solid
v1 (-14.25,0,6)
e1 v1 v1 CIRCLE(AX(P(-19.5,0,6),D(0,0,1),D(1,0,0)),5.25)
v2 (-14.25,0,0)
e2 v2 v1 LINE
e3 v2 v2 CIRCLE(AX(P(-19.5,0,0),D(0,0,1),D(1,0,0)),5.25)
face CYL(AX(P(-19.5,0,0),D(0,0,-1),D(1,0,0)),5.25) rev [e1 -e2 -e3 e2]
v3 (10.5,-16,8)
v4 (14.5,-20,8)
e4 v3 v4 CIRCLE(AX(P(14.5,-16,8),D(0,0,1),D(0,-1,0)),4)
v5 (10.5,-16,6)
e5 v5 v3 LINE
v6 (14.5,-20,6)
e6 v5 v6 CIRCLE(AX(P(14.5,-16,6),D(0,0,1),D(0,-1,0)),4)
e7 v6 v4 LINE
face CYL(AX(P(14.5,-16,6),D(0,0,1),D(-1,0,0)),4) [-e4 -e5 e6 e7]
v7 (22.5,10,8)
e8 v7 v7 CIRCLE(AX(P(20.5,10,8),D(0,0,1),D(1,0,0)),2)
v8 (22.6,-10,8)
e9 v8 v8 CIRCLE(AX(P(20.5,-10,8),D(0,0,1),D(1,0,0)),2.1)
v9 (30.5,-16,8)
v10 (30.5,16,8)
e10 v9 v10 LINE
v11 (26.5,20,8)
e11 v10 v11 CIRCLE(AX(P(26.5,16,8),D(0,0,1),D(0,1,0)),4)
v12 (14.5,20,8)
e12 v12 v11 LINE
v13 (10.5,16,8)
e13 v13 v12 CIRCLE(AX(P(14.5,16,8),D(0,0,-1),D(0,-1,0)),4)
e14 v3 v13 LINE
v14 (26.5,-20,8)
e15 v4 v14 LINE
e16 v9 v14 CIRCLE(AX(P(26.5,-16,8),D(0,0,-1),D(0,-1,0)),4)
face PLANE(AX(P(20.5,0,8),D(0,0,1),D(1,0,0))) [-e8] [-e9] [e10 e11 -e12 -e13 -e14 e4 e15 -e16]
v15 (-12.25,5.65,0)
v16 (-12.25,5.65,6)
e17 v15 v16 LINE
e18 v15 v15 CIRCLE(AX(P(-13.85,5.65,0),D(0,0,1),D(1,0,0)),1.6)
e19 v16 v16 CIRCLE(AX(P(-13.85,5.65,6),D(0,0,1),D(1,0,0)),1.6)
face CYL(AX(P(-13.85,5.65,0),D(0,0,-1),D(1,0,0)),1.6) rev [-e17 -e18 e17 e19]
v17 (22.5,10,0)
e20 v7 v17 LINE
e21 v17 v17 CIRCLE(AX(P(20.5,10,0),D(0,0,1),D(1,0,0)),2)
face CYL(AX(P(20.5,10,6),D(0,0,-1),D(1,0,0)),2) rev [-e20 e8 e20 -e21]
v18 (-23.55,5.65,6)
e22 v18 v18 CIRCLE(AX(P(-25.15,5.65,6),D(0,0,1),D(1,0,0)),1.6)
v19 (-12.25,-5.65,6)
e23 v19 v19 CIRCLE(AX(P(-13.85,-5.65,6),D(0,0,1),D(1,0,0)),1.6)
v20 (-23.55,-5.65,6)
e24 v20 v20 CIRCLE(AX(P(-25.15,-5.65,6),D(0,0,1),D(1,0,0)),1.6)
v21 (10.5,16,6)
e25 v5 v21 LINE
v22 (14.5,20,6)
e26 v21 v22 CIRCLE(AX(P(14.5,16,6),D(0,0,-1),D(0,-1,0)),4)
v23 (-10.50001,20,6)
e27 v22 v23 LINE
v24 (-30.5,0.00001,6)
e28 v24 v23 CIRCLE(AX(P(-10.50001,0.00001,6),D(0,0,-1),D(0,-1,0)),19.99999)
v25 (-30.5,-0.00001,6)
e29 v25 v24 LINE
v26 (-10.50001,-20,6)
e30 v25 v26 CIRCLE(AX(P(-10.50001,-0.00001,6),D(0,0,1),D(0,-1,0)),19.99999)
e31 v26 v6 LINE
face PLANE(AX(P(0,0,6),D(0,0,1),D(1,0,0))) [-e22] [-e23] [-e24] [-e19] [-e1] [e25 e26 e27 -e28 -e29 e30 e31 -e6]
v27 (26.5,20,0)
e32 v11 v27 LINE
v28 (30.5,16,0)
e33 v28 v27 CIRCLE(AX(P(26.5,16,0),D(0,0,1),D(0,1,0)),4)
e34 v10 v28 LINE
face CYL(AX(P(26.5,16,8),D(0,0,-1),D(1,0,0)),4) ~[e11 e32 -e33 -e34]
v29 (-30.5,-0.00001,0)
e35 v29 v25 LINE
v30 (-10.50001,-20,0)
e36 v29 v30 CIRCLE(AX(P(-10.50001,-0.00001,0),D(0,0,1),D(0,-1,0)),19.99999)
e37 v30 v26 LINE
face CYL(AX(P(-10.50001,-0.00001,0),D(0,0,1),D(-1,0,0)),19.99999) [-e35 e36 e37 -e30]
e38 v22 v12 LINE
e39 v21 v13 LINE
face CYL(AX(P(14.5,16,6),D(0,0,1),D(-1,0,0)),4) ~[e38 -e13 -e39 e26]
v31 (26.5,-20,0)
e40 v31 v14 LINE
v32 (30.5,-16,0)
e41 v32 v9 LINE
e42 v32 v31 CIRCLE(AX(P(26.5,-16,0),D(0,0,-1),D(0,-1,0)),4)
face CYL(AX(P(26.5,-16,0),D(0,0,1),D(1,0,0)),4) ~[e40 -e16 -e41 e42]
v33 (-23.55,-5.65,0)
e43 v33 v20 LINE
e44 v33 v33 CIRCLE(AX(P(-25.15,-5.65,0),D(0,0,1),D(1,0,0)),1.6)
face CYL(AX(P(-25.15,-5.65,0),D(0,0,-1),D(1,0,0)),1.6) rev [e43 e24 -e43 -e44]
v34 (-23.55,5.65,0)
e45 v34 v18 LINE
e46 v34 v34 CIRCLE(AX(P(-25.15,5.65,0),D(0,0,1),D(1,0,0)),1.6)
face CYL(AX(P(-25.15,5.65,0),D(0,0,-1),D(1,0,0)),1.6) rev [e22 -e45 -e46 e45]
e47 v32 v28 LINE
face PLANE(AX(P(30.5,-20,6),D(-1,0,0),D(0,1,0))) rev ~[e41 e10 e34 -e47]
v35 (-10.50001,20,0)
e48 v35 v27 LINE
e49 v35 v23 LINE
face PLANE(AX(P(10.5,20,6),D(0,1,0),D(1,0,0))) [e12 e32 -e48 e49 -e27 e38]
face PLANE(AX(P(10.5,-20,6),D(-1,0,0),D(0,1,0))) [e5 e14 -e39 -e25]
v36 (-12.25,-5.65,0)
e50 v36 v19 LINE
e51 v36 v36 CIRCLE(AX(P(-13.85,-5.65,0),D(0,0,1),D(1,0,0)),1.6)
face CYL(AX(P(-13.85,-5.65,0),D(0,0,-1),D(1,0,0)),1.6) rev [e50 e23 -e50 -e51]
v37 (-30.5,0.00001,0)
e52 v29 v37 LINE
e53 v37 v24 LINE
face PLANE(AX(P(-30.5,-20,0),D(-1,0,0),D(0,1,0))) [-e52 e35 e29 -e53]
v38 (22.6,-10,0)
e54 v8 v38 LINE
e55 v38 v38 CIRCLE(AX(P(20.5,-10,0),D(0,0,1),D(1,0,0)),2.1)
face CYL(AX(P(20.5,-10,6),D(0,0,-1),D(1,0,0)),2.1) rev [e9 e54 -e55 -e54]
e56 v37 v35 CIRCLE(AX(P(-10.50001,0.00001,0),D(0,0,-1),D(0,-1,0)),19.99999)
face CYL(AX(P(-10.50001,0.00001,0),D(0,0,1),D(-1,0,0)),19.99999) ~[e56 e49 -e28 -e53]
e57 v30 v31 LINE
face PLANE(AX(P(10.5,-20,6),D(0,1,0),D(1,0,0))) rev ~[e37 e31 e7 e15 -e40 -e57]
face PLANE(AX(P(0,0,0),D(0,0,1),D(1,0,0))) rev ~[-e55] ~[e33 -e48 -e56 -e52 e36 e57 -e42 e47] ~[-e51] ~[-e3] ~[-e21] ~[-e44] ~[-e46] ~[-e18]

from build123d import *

# Parameters (mm, degrees)
F0_W     = 61
F0_H     = 40
F0_R     = 1.6
F0_R_2   = 2.1
F0_R_3   = 5.25
F0_R_4   = 2
F1_DEPTH = 6
F2_DEPTH = 77
F3_R     = 19.99999
F4_W     = 20
F4_H     = 40
F4_R     = 2.1
F4_R_2   = 2
F5_DEPTH = 2
F6_R     = 4


# Not quite as in the source:
# - a fillet or chamfer is up to 0.001 mm smaller than in the source, because OpenCascade refuses the exact size
# - an extrude ends at something that could not be found from the text; its depth is read off the source's solid


with BuildPart() as f1:
    # F0 (on Top) → F1 (new body)
    with BuildSketch(Plane.XY):
        Rectangle(F0_W, F0_H)
        with Locations((-25.15, -5.65)):
            Circle(F0_R, mode=Mode.SUBTRACT)
        with Locations((-13.85, -5.65)):
            Circle(F0_R, mode=Mode.SUBTRACT)
        with Locations((20.5, -10)):
            Circle(F0_R_2, mode=Mode.SUBTRACT)
        with Locations((-19.5, 0)):
            Circle(F0_R_3, mode=Mode.SUBTRACT)
        with Locations((-25.15, 5.65)):
            Circle(F0_R, mode=Mode.SUBTRACT)
        with Locations((-13.85, 5.65)):
            Circle(F0_R, mode=Mode.SUBTRACT)
        with Locations((20.5, 10)):
            Circle(F0_R_4, mode=Mode.SUBTRACT)
    extrude(amount=F1_DEPTH)

    # F0 (on Top) → F2 (cut, through all)
    with BuildSketch(Plane.XY):
        Rectangle(F0_W, F0_H)
        with Locations((-25.15, -5.65)):
            Circle(F0_R, mode=Mode.SUBTRACT)
        with Locations((-13.85, -5.65)):
            Circle(F0_R, mode=Mode.SUBTRACT)
        with Locations((20.5, -10)):
            Circle(F0_R_2, mode=Mode.SUBTRACT)
        with Locations((-19.5, 0)):
            Circle(F0_R_3, mode=Mode.SUBTRACT)
        with Locations((-25.15, 5.65)):
            Circle(F0_R, mode=Mode.SUBTRACT)
        with Locations((-13.85, 5.65)):
            Circle(F0_R, mode=Mode.SUBTRACT)
        with Locations((20.5, 10)):
            Circle(F0_R_4, mode=Mode.SUBTRACT)
    extrude(amount=-F2_DEPTH, mode=Mode.SUBTRACT)

    # F3 (radius 20 in the source; OpenCascade refuses exactly that, so slightly less here)
    f3_edges = [f1.edges().sort_by_distance(p)[0] for p in [
        (-30.5, -20, 3),
        (-30.5, 20, 3),
    ]]
    fillet(f3_edges, radius=F3_R)

    # F4 (on face) → F5 (join)
    with BuildSketch(Plane.XY.offset(6)):
        with Locations((20.5, 0)):
            Rectangle(F4_W, F4_H)
        with Locations((20.5, -10)):
            Circle(F4_R, mode=Mode.SUBTRACT)
        with Locations((20.5, 10)):
            Circle(F4_R_2, mode=Mode.SUBTRACT)
    extrude(amount=F5_DEPTH)

    # F6
    f6_edges = [f1.edges().sort_by_distance(p)[0] for p in [
        (10.5, -20, 7),
        (30.5, -20, 4),
        (10.5, 20, 7),
        (30.5, 20, 4),
    ]]
    fillet(f6_edges, radius=F6_R)


solid = f1.part
